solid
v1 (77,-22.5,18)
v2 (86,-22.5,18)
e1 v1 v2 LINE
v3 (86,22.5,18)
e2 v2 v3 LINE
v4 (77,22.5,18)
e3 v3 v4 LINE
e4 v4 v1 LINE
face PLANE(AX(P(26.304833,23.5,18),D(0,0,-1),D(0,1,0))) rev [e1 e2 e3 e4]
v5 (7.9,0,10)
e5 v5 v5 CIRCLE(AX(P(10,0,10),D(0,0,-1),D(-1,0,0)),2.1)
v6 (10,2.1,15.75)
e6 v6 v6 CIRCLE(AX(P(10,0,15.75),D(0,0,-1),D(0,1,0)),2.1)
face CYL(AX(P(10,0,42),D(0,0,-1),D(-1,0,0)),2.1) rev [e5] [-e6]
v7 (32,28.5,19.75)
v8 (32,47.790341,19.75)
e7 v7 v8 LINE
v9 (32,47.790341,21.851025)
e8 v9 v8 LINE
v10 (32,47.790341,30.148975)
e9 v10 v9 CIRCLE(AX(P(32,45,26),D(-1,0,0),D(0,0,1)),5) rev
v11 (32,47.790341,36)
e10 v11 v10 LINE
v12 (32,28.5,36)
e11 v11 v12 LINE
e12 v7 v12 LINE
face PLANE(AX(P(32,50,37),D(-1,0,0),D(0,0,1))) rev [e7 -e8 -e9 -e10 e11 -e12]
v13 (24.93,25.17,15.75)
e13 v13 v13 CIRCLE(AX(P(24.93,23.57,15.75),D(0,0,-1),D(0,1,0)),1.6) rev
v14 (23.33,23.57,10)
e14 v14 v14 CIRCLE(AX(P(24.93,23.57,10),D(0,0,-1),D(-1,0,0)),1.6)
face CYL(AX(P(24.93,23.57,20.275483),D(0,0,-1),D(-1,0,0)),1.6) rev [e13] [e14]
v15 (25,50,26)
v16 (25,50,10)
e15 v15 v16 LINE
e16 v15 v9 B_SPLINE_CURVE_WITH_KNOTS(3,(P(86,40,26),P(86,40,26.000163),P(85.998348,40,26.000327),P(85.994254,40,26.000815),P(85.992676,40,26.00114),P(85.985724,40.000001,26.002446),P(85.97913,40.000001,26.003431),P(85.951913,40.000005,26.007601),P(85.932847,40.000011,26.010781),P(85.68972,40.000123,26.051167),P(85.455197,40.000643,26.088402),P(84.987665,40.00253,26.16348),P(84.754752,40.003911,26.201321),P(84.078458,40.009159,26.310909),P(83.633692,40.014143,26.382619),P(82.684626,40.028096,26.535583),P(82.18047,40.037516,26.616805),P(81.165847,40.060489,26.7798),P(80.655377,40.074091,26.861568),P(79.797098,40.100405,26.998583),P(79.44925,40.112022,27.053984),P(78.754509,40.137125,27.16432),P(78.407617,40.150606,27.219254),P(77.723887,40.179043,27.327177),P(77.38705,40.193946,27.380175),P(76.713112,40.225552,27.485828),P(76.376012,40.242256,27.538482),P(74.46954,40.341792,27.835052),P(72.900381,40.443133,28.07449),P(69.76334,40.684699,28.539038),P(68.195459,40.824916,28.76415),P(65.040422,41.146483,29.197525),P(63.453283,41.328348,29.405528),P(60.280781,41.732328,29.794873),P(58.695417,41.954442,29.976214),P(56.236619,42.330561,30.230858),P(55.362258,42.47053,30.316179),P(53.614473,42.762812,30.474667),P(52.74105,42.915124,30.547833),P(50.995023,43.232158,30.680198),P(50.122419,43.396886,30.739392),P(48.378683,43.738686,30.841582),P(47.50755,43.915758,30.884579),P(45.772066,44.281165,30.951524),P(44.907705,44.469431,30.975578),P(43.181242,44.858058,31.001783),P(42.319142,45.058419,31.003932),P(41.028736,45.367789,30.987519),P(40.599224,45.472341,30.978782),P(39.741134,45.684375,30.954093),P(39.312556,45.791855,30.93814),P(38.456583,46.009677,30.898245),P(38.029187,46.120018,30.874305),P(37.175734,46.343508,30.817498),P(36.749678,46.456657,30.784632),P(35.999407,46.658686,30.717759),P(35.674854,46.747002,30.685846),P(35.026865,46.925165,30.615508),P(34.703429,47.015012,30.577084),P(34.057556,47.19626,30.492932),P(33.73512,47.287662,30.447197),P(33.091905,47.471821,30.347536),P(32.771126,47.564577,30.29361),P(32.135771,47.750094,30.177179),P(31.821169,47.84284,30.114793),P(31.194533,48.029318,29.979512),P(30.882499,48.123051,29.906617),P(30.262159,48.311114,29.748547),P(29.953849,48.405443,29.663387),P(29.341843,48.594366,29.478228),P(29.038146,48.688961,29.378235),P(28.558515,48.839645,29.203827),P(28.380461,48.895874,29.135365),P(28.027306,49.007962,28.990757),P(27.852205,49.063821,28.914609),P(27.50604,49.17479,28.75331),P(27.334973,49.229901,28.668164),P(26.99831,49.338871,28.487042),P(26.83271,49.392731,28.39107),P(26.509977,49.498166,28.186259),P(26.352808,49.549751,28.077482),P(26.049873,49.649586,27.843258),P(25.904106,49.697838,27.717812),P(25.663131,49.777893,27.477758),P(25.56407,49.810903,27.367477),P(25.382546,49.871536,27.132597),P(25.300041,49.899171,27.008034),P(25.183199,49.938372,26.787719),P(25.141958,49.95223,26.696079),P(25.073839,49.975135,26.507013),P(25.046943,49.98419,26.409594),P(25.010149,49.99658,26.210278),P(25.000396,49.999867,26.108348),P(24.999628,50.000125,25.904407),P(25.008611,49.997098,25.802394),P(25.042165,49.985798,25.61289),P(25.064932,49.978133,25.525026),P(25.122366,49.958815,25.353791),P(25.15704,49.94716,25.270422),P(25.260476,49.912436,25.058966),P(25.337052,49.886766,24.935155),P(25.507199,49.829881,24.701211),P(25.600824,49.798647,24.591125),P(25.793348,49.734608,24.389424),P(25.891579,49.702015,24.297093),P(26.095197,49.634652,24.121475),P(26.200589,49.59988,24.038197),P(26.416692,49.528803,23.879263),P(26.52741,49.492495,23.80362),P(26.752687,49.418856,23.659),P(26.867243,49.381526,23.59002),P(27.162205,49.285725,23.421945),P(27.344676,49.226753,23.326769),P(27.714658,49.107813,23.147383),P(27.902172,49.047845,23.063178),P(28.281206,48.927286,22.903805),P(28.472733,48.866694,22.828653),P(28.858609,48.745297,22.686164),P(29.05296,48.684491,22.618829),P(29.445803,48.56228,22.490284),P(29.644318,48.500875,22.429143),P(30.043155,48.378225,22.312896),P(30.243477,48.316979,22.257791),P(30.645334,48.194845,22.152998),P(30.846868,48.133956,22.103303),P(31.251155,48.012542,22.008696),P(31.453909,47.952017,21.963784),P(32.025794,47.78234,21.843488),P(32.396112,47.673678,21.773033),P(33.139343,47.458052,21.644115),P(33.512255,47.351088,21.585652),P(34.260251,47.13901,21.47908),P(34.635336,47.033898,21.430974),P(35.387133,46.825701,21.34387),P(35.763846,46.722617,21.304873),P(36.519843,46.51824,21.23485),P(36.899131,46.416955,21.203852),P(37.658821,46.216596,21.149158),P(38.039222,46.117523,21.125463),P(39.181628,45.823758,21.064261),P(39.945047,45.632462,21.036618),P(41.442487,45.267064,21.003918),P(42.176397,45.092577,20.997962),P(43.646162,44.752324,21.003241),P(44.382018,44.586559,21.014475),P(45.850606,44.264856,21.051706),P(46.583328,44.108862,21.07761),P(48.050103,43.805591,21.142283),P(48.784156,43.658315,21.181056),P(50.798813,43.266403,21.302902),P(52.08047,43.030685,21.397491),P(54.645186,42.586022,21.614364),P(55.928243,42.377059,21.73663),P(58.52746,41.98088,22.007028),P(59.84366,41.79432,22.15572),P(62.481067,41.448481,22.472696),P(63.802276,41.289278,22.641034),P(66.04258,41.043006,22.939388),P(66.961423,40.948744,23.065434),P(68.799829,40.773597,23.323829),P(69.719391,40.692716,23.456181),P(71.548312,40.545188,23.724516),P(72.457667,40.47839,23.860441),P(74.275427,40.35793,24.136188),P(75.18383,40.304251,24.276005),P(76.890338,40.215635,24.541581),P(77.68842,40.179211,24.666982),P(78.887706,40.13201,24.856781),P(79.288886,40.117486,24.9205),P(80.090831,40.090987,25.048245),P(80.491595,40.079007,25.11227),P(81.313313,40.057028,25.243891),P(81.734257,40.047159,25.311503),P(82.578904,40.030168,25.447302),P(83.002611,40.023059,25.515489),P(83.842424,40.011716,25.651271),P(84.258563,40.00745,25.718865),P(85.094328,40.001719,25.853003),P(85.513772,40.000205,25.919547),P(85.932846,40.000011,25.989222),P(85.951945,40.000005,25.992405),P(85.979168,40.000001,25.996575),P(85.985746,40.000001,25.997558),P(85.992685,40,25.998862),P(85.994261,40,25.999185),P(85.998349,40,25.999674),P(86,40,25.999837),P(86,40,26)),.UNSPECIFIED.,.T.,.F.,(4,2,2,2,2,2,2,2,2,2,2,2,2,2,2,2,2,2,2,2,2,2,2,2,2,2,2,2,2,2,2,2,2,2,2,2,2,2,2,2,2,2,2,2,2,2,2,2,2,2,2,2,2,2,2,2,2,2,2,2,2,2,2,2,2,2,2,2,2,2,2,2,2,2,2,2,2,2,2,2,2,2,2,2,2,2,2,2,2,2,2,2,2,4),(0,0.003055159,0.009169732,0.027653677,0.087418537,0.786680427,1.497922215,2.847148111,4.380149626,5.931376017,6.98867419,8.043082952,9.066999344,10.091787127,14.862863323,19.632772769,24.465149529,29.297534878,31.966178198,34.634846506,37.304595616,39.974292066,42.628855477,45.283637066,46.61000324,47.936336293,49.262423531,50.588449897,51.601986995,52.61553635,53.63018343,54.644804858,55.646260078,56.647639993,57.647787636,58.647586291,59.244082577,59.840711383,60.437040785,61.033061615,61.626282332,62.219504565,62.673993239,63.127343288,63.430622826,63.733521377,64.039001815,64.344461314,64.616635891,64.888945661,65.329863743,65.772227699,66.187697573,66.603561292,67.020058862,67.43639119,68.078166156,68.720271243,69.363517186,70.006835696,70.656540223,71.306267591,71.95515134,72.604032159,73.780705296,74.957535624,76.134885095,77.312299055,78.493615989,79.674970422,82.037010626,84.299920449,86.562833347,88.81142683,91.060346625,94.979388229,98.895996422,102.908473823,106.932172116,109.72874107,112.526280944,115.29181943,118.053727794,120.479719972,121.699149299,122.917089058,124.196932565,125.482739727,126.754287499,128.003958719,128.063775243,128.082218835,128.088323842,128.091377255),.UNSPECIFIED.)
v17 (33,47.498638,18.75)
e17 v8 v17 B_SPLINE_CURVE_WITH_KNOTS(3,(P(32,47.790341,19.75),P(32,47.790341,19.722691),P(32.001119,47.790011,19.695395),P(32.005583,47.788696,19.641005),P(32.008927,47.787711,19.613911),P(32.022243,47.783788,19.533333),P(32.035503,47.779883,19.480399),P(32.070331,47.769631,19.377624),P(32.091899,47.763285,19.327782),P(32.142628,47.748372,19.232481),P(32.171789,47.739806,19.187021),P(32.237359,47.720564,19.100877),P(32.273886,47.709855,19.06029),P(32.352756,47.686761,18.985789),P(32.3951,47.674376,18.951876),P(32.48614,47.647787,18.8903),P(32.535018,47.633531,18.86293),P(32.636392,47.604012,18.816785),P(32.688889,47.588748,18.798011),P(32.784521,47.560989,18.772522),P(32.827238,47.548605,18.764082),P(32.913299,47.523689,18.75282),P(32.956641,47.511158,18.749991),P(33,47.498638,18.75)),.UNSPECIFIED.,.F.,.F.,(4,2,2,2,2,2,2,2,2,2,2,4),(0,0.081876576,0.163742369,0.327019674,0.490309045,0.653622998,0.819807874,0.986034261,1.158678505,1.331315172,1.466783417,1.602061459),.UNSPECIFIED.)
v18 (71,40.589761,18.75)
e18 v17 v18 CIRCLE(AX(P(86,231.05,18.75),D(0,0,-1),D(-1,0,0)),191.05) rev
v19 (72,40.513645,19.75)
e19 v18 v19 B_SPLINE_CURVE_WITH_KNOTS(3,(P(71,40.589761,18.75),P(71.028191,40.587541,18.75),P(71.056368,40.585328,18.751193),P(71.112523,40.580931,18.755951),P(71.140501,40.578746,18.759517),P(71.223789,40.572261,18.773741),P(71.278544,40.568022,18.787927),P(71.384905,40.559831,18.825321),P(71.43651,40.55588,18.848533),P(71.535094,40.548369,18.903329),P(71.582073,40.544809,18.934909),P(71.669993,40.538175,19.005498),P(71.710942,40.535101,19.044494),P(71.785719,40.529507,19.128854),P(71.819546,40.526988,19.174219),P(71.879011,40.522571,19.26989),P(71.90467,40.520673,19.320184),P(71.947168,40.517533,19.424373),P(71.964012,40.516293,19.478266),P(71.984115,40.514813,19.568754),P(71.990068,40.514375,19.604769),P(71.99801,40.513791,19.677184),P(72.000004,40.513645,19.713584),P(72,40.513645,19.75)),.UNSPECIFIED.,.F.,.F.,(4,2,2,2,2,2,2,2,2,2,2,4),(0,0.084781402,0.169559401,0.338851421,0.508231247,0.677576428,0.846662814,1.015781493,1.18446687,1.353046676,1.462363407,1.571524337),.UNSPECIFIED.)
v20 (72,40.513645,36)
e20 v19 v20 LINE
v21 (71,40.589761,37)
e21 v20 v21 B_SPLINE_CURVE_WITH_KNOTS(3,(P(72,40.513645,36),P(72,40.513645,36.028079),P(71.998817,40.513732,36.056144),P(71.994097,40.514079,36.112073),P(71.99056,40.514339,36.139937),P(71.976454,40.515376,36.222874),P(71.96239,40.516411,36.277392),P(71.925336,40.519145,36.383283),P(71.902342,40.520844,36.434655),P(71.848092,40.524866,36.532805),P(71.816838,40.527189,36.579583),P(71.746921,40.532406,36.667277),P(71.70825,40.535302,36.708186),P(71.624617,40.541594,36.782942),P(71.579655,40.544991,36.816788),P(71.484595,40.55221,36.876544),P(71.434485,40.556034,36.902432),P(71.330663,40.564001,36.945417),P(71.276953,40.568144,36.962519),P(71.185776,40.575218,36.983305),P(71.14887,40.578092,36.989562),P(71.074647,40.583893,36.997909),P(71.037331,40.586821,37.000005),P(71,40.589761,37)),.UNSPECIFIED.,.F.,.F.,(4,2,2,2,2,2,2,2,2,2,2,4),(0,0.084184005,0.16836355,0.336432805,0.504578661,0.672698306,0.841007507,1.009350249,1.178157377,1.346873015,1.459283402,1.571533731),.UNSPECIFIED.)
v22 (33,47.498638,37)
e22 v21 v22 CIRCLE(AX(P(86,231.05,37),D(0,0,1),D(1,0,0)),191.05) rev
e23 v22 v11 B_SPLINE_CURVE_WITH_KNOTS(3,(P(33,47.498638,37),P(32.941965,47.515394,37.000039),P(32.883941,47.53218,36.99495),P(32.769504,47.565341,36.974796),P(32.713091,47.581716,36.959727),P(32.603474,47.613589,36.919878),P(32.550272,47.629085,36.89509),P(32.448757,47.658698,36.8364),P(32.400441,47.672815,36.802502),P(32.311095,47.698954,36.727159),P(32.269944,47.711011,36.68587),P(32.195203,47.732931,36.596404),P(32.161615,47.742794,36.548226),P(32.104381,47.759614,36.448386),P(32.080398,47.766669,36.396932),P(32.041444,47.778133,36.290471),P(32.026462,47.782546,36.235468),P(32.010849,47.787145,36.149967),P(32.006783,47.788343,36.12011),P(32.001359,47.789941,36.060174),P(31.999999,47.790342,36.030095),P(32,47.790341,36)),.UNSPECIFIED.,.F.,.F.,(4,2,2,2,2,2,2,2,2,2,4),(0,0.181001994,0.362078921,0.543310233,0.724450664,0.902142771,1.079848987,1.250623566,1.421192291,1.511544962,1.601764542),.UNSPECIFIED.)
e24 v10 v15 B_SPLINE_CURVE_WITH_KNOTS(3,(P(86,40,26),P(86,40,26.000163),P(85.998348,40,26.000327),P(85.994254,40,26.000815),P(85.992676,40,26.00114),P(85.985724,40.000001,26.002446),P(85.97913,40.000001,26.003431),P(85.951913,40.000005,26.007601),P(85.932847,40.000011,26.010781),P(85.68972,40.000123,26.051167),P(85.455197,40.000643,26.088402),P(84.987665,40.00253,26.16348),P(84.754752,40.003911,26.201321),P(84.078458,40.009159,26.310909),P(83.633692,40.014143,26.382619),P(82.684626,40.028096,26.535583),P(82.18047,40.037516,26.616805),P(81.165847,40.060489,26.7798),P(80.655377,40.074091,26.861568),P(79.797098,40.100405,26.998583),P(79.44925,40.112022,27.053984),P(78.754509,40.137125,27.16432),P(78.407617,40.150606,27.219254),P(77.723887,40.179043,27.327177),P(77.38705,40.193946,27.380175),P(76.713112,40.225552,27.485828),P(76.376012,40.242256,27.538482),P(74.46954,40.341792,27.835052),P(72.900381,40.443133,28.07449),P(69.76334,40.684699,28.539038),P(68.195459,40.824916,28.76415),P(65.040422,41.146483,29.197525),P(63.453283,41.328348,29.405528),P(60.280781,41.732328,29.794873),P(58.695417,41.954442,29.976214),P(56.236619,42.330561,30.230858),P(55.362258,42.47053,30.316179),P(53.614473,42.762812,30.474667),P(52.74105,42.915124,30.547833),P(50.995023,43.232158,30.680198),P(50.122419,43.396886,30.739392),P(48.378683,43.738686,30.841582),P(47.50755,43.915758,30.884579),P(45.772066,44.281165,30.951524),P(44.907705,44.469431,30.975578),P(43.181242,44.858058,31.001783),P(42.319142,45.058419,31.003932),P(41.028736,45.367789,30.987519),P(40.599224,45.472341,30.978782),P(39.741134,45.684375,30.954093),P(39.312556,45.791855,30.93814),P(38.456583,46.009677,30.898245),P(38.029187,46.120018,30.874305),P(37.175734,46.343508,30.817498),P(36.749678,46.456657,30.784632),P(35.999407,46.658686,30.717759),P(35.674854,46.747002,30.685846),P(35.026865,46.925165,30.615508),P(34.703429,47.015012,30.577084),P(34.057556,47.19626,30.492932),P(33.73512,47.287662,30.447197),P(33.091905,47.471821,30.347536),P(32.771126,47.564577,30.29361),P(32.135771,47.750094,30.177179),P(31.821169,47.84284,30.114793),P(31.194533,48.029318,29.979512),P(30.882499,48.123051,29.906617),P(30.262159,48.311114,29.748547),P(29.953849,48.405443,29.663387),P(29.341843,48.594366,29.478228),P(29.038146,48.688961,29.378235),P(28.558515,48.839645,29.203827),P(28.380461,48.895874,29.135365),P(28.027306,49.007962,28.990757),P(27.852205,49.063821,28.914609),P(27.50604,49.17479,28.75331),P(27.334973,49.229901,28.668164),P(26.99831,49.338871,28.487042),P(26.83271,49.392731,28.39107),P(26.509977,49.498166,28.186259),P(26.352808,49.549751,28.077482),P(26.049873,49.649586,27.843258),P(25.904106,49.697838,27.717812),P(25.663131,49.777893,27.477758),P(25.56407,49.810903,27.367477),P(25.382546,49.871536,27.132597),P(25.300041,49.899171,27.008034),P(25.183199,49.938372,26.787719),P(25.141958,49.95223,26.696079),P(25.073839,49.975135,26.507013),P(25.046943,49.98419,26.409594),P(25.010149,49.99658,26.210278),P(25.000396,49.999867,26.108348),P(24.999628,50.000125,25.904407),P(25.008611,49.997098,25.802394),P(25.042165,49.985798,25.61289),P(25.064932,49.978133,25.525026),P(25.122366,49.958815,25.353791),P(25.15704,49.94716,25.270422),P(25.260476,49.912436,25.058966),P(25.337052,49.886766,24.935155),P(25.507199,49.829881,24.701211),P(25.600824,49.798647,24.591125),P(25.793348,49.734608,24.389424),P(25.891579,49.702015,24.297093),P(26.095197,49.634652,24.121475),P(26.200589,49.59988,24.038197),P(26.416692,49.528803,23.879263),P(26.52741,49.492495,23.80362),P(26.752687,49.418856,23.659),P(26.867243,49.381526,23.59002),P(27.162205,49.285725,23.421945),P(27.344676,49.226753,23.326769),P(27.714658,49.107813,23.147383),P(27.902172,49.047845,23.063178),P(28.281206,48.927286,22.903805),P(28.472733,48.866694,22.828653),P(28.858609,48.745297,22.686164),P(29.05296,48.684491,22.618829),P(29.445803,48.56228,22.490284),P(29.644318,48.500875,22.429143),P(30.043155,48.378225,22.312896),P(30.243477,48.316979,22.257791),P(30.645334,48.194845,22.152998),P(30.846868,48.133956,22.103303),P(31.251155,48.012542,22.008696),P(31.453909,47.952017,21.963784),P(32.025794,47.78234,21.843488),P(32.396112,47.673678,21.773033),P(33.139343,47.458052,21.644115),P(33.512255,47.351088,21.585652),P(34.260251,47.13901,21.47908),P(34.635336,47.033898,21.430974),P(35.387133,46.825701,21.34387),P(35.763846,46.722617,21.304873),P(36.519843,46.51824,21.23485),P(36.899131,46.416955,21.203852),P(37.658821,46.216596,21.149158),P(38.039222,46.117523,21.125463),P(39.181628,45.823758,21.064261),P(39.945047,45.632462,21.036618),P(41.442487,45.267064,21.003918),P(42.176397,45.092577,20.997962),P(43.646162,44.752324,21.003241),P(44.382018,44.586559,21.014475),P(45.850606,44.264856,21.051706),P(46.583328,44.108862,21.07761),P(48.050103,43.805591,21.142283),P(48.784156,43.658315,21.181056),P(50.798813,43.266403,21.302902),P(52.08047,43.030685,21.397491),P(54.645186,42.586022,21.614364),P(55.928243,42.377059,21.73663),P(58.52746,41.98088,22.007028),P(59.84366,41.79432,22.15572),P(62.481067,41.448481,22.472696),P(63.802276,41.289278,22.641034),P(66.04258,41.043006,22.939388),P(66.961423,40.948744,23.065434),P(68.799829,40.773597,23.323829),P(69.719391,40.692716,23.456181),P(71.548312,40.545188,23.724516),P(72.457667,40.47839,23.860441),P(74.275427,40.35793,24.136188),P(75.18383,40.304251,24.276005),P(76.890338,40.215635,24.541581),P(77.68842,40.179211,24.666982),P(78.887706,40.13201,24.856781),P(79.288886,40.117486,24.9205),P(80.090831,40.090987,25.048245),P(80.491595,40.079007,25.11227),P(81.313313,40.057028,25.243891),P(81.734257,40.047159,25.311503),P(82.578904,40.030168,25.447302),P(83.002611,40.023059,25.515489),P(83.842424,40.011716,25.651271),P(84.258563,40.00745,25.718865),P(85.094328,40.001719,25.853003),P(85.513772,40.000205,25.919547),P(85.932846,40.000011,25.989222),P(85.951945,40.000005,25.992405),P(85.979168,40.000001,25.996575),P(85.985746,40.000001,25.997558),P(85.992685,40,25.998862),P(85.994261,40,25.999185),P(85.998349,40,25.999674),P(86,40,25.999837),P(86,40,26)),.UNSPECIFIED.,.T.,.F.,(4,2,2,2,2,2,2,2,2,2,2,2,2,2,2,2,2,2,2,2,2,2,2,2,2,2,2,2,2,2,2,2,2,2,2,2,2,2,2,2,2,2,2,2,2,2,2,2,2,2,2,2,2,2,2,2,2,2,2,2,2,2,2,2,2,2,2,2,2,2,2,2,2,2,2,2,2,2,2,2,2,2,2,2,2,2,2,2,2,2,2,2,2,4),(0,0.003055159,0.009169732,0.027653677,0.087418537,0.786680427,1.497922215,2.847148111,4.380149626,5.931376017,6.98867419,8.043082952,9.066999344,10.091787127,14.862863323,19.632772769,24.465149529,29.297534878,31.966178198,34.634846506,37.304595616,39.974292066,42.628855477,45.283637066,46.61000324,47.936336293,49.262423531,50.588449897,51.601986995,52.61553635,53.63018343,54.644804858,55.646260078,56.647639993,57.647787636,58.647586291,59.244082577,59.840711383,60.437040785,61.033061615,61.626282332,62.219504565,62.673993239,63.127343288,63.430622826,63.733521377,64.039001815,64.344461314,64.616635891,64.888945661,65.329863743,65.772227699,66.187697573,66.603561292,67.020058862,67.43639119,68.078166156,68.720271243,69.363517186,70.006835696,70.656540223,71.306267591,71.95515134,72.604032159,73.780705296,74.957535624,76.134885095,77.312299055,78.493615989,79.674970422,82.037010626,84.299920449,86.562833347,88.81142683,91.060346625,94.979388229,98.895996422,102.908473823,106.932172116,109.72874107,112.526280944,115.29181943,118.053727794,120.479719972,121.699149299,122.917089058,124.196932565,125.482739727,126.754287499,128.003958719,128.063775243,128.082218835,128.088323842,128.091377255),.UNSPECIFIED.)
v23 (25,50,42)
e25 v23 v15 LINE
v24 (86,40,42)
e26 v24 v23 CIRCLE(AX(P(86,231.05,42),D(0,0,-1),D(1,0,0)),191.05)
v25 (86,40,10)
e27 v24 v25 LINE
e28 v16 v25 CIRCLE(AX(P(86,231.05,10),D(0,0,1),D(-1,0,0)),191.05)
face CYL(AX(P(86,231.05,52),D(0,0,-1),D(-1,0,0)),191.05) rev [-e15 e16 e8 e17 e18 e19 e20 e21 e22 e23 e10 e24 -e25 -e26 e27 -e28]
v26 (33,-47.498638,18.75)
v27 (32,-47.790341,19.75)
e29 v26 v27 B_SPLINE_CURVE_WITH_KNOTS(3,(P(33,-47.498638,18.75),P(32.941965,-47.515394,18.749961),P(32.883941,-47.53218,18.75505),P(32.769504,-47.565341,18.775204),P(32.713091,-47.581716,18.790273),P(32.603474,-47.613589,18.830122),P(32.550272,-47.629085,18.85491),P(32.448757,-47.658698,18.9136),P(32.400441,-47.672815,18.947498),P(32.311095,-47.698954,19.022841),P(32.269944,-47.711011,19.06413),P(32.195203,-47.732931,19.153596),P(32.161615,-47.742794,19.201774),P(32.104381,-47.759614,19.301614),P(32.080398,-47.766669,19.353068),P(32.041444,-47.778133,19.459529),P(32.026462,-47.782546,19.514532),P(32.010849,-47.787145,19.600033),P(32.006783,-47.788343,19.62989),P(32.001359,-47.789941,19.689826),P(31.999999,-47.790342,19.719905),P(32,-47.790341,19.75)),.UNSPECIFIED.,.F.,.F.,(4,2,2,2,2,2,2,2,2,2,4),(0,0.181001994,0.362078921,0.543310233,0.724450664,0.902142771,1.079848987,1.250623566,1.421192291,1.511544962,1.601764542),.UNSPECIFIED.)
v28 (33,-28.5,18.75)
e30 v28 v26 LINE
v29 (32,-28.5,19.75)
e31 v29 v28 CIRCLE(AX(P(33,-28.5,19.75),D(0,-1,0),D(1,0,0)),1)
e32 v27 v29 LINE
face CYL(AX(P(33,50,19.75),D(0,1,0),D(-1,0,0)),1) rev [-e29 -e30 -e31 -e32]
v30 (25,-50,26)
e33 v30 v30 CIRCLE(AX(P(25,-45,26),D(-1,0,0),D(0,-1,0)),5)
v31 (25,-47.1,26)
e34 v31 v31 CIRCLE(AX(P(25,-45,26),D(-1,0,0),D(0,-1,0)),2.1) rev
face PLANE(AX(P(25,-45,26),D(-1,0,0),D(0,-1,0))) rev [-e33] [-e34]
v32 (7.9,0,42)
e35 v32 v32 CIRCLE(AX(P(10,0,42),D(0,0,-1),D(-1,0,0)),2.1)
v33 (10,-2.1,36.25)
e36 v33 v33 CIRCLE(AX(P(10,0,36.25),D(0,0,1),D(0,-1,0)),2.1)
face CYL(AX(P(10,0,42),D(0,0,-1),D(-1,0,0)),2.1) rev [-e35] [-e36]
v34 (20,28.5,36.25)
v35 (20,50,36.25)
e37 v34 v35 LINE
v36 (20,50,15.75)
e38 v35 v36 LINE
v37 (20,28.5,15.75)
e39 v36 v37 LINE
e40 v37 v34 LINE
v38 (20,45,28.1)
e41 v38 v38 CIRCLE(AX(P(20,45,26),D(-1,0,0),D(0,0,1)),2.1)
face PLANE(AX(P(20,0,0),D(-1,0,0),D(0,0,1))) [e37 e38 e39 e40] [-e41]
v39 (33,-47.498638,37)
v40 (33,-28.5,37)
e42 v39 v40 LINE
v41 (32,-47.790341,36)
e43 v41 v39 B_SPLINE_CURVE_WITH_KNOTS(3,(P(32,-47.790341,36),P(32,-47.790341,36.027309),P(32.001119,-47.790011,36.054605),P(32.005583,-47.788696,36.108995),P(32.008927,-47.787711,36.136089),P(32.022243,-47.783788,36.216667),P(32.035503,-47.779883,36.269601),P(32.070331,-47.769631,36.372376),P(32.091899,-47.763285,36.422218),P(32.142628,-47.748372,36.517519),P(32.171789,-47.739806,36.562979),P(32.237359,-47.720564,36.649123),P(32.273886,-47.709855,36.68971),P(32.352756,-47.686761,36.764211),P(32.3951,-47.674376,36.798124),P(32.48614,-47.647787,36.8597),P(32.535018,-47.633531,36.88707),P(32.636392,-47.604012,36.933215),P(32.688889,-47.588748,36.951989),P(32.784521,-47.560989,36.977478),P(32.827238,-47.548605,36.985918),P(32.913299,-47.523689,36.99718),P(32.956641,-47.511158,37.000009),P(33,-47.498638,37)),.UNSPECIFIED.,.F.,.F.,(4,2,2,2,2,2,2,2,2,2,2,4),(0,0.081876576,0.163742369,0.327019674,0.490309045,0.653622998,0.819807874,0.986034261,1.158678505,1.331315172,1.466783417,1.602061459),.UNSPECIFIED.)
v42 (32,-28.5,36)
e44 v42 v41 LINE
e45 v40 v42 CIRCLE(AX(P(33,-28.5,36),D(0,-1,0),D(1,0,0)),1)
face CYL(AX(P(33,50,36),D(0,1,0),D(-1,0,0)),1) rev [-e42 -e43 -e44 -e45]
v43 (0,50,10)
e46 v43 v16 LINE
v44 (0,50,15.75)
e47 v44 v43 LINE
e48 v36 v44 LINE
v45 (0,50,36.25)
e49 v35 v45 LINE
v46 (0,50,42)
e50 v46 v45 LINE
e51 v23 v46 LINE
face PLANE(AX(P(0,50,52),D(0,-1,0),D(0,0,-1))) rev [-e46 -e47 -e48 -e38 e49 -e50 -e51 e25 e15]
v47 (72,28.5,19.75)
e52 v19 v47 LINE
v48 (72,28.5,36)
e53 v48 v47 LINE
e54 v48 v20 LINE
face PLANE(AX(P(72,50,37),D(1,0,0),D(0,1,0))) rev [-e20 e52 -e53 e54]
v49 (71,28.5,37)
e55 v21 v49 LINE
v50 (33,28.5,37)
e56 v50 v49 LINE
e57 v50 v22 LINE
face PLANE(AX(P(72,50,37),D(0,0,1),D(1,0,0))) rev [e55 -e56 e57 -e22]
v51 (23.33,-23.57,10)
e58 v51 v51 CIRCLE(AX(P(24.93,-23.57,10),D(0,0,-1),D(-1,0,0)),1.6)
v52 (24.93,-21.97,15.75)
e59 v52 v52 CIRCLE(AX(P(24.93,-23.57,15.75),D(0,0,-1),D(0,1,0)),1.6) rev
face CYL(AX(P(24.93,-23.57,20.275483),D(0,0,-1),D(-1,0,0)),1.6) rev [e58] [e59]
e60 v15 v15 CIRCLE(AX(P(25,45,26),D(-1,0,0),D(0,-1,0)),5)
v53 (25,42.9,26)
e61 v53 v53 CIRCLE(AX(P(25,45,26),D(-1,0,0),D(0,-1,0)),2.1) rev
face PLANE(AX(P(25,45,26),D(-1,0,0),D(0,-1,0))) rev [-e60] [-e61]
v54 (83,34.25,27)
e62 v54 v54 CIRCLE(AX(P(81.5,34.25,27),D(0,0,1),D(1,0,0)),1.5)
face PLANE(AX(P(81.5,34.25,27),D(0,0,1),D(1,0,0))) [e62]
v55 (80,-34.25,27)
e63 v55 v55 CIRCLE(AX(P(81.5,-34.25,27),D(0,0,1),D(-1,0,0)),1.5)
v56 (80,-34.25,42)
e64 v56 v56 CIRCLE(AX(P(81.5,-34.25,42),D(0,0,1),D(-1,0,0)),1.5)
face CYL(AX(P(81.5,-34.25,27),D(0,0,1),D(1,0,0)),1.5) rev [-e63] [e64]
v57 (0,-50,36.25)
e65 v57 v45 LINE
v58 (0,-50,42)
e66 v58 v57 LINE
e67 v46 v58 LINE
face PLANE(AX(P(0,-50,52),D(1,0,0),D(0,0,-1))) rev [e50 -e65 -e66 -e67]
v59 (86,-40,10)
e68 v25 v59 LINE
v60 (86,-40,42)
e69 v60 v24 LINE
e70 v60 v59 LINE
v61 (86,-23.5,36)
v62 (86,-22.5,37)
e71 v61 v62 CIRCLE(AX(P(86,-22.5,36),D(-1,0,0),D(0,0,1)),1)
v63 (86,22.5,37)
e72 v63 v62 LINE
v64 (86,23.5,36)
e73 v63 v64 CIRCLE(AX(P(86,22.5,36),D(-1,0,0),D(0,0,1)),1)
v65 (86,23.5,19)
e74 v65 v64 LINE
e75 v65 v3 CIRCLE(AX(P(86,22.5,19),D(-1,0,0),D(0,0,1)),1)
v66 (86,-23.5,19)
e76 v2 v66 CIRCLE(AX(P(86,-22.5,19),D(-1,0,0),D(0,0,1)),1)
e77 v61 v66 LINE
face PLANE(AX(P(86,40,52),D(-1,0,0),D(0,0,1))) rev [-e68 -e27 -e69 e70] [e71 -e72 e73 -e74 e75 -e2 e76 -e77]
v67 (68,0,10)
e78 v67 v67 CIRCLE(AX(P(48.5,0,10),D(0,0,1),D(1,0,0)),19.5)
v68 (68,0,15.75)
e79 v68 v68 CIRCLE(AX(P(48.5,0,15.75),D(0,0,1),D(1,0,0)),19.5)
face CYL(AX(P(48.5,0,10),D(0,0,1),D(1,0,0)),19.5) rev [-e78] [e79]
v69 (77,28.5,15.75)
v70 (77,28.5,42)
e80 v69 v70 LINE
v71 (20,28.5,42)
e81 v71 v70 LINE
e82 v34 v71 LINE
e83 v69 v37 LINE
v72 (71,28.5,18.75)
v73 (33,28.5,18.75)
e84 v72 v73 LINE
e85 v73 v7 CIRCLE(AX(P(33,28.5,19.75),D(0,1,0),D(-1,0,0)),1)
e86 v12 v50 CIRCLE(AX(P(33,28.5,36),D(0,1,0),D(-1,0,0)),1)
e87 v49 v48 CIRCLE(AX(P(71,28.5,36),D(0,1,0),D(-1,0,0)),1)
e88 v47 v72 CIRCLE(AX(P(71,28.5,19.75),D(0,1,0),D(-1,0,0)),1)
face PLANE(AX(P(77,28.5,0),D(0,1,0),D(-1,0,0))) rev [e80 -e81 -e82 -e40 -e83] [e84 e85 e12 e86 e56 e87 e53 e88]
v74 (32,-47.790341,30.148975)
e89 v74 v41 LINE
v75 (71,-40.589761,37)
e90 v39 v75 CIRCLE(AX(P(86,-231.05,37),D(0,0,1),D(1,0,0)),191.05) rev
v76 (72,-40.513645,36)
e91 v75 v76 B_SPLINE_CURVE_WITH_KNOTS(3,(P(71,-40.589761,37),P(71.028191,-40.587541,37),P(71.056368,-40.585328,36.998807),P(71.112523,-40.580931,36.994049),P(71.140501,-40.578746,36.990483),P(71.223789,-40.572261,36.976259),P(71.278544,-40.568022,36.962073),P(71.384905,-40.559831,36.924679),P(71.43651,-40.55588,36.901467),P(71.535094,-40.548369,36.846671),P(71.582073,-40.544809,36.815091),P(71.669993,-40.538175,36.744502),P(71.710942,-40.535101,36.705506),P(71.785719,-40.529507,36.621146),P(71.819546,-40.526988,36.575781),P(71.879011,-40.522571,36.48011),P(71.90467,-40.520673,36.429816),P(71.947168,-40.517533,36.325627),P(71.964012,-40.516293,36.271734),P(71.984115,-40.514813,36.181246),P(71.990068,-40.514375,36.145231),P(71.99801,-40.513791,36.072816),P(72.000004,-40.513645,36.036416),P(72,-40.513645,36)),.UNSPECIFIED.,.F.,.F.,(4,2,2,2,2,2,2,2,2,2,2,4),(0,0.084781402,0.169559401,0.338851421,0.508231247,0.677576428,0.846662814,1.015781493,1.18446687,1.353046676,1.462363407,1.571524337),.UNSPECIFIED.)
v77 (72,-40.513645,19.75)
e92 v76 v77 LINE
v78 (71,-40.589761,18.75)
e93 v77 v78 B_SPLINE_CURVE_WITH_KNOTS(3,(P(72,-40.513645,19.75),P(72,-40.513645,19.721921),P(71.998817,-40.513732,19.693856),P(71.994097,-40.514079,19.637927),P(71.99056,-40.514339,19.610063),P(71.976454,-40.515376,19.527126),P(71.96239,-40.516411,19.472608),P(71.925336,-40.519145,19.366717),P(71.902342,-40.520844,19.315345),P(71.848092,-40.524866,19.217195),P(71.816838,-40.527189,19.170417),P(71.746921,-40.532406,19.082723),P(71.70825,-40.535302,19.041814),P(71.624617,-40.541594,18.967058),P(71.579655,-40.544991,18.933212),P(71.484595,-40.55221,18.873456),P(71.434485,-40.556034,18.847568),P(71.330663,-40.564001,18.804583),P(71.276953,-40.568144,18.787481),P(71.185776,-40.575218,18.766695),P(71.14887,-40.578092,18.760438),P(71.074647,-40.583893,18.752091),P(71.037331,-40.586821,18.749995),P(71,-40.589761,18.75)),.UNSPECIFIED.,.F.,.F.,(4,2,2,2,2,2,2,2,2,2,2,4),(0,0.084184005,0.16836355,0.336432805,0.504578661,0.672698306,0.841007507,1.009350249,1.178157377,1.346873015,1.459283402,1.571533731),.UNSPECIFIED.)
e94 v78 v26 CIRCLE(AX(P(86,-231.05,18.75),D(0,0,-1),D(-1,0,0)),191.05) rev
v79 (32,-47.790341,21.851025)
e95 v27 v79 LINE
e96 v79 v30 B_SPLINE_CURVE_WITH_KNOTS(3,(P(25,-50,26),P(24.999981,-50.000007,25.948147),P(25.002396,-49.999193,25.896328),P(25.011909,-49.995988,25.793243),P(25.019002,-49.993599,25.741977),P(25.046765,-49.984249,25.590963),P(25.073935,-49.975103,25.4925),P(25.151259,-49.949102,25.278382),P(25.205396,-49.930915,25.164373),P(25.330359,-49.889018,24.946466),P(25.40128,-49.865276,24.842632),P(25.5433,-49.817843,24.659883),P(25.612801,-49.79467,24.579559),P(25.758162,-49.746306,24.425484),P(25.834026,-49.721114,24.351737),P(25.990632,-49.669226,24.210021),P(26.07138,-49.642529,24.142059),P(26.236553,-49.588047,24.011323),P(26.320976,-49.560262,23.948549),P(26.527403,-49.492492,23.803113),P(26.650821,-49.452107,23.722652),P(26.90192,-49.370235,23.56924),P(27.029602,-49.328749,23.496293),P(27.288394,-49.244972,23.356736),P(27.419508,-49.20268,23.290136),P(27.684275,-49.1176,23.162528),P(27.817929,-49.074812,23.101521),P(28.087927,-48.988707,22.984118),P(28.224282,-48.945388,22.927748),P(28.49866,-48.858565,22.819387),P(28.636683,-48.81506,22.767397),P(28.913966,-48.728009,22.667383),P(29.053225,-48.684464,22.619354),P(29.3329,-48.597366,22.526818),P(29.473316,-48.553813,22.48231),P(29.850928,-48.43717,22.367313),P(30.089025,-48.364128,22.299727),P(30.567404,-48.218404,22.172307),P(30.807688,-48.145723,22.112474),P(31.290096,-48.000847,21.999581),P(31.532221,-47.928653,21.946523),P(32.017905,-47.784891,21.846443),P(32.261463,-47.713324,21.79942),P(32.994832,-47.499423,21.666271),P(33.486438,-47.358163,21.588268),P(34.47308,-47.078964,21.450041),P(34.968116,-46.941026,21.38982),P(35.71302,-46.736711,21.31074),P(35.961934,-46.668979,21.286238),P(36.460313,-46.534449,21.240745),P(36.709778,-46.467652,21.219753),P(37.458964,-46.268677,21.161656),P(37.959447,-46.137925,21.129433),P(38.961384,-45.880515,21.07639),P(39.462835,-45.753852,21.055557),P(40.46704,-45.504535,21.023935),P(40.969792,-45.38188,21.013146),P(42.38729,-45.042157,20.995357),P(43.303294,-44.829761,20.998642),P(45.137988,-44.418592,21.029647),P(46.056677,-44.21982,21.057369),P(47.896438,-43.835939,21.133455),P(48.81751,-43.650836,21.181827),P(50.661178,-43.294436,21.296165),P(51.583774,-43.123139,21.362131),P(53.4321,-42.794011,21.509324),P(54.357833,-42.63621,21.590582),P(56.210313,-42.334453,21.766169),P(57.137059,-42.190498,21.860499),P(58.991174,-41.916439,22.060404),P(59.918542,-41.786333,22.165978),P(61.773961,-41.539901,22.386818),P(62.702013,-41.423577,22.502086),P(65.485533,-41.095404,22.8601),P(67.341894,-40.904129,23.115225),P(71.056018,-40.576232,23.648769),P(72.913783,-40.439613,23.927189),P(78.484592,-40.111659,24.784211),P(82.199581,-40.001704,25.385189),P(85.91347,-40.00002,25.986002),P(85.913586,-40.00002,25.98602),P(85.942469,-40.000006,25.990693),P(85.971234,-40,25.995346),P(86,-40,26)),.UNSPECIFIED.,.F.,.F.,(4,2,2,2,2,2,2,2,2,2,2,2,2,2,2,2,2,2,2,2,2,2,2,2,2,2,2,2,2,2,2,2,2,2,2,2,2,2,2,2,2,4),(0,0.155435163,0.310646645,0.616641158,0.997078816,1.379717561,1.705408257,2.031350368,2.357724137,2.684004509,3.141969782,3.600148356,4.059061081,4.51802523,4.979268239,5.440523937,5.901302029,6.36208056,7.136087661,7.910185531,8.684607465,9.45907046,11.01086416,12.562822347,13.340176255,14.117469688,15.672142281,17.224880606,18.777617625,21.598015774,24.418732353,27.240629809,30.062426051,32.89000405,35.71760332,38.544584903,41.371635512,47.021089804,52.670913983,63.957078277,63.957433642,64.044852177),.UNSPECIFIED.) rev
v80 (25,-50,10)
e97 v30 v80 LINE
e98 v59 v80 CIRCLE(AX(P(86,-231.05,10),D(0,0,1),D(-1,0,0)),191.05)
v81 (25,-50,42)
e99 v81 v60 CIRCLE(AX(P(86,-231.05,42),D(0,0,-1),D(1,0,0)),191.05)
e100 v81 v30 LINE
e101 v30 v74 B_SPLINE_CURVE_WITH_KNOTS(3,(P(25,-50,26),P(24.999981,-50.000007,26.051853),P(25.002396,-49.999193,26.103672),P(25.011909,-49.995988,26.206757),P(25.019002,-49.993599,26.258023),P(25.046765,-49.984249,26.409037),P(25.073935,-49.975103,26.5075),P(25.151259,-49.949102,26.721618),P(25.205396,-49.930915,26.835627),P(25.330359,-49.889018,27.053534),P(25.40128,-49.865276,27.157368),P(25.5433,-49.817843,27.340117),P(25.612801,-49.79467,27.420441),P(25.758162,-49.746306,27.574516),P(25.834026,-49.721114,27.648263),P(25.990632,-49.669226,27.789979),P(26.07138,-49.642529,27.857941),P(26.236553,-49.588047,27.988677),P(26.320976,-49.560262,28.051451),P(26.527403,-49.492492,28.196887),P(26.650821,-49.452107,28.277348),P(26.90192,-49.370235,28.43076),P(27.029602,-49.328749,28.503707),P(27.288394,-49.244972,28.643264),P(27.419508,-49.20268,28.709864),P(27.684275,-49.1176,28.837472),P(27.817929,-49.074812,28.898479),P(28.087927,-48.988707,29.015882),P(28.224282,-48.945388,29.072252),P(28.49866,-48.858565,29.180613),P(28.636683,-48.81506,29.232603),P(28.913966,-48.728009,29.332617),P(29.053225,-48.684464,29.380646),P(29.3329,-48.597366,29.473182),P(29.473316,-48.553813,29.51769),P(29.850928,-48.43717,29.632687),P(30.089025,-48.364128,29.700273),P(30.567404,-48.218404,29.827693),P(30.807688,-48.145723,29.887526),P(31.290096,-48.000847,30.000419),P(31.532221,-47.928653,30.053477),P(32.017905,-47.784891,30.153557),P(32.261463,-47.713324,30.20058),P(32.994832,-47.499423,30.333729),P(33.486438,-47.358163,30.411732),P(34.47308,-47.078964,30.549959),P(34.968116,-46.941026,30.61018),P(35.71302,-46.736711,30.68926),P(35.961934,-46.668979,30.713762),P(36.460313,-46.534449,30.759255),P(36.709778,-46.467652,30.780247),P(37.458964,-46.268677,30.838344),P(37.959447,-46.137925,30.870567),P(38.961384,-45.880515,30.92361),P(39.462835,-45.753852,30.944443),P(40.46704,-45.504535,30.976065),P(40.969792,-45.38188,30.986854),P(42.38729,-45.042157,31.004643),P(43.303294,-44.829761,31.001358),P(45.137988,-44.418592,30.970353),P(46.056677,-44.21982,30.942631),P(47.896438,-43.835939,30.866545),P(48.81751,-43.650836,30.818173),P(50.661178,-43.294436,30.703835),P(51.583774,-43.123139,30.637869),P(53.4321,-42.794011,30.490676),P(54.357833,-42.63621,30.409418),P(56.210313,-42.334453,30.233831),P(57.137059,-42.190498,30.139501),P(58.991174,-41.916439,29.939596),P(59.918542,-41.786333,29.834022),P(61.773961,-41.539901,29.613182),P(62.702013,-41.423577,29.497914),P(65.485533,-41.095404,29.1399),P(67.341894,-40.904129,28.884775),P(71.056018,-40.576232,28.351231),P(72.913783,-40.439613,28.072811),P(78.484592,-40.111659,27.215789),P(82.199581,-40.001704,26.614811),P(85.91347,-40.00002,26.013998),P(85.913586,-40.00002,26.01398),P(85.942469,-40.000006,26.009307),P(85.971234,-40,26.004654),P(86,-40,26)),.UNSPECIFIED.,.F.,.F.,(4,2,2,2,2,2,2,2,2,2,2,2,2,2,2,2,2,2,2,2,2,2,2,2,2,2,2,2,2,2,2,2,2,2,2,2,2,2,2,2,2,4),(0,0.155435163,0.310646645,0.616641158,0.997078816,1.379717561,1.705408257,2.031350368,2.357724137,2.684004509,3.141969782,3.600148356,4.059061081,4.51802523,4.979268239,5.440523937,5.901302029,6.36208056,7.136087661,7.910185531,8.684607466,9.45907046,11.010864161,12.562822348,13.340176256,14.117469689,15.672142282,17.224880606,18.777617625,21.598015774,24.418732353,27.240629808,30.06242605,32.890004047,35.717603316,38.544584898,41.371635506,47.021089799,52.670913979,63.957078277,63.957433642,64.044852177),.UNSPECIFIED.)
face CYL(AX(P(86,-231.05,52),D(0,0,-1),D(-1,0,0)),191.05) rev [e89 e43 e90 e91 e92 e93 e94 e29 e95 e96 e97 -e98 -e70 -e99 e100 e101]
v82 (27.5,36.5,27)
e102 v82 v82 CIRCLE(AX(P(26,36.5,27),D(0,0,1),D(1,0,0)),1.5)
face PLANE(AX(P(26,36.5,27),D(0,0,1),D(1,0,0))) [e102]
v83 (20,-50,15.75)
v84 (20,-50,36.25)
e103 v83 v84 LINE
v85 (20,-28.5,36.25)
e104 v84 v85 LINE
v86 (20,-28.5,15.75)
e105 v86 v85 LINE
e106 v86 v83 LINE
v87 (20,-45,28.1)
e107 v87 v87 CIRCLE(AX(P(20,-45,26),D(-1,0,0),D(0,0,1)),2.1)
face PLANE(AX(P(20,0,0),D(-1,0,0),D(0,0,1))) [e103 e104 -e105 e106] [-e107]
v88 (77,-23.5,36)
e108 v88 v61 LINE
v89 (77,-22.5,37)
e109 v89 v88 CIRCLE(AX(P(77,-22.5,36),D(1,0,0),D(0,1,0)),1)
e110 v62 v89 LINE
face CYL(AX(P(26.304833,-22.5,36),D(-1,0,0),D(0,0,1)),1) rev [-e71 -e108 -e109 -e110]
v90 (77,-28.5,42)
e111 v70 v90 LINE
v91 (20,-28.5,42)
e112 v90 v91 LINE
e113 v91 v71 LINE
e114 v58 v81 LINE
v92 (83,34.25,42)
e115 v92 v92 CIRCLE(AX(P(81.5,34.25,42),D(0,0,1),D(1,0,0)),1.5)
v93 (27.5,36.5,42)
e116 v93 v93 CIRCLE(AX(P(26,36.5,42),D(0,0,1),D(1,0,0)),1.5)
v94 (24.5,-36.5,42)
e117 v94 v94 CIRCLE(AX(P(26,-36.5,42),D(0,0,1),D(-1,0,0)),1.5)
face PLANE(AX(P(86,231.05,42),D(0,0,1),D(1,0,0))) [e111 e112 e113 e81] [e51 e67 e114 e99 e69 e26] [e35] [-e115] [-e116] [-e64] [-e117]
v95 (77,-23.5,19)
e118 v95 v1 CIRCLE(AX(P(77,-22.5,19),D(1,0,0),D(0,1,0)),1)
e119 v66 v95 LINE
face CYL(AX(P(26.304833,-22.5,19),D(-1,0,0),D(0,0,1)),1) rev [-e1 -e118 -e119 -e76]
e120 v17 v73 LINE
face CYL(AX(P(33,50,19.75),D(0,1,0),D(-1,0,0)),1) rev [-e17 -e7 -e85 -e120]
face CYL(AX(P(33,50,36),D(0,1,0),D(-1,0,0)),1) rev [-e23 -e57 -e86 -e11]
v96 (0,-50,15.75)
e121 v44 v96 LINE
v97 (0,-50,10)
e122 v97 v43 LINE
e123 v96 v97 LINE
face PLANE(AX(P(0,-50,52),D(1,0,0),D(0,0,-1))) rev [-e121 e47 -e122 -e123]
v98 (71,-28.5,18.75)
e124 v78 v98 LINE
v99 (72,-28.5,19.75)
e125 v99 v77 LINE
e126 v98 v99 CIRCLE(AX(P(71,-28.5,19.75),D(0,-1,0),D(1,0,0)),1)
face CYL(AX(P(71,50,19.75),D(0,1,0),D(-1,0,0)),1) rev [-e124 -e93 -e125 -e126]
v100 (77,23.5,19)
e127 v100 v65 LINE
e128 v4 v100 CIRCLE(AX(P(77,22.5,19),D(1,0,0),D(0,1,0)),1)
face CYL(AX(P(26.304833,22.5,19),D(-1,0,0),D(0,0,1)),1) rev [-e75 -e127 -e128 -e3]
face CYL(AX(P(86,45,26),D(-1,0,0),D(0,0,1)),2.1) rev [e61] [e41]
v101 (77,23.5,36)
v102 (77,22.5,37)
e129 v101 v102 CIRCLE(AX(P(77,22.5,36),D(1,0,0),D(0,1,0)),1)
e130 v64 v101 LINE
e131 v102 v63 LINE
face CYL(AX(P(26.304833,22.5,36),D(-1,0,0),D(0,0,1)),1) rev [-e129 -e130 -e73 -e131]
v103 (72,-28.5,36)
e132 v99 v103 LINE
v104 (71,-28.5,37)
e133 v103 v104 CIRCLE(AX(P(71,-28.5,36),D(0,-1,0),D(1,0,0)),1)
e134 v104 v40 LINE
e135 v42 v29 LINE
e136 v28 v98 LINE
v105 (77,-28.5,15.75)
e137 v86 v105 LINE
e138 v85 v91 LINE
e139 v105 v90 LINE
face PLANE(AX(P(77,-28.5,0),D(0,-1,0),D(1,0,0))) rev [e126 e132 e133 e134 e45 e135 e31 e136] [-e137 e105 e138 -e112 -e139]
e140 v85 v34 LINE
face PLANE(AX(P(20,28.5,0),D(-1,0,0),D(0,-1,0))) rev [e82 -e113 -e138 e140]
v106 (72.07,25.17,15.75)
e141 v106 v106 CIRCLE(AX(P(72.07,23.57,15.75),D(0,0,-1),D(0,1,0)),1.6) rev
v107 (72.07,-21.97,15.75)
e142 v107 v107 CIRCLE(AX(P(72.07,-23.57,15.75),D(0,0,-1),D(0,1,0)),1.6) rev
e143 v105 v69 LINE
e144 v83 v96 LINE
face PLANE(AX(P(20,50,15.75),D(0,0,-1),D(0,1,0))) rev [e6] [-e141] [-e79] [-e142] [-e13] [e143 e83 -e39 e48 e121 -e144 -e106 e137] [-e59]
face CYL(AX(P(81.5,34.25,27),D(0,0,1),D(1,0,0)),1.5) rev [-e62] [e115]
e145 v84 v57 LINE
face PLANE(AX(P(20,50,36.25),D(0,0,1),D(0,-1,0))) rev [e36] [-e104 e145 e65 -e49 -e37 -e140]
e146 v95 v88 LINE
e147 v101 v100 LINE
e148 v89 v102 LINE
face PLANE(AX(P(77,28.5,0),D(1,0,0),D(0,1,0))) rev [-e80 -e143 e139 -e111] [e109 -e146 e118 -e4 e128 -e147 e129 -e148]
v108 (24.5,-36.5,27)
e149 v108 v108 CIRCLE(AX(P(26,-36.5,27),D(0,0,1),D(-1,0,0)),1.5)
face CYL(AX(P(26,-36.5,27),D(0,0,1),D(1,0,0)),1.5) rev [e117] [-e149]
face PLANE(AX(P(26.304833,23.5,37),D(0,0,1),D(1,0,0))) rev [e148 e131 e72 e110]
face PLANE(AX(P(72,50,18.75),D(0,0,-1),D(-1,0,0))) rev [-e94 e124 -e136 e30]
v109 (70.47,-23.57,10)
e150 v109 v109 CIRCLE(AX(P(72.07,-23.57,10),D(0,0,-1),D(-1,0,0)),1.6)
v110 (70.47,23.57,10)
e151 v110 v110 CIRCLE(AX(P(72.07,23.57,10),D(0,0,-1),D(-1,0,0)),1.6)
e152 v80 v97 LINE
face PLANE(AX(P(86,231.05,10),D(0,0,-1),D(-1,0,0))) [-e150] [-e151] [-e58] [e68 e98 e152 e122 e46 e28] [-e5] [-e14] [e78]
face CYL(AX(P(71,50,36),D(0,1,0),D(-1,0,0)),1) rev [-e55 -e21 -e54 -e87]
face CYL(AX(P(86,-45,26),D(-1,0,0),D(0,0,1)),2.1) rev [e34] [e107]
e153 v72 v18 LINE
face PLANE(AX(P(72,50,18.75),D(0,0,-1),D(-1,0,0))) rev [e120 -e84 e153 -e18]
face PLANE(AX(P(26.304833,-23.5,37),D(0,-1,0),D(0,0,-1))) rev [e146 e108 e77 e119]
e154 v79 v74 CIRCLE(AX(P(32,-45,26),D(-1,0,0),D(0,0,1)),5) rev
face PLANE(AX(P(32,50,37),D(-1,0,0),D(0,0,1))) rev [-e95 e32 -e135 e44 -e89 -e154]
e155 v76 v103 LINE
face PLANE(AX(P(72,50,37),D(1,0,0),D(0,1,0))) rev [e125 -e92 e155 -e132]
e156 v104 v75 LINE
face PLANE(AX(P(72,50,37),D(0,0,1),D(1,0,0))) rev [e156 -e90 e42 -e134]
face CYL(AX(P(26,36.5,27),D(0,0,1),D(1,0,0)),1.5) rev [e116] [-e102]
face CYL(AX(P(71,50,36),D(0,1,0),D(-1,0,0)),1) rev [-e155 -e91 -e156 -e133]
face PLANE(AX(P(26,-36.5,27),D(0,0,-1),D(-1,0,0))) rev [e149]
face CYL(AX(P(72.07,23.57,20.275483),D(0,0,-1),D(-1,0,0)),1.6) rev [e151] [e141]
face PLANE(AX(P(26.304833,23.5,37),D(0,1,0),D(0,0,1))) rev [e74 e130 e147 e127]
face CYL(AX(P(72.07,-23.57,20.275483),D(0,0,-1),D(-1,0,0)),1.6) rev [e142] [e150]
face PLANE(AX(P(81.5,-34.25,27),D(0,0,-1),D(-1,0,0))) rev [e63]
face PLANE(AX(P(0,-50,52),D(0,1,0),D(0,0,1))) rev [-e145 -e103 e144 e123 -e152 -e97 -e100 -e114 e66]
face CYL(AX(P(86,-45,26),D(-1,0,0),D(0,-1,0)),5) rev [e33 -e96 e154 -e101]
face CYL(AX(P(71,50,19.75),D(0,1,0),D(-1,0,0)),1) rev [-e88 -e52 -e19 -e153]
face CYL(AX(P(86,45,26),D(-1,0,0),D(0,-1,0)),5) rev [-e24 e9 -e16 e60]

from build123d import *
from build123d.topology import SkipClean

# Parameters (mm, degrees)
EXTRUDE_1_DEPTH           = 52
CUT_EXTRUDE_1_DEPTH       = 113.24972160321826
CUT_EXTRUDE_2_DEPTH       = 20
CUT_EXTRUDE_3_DEPTH       = 10
CUT_EXTRUDE_START         = -10
CUT_EXTRUDE_4_DEPTH       = 10
EXTRUDE_2_DEPTH           = 5.75
SKETCH_7_R                = 19.499999999999996
CUT_EXTRUDE_5_DEPTH       = 103.88373292216811
SKETCH_8_R                = 2.1
CUT_EXTRUDE_6_DEPTH       = 93.84395510748136
CUT_EXTRUDE_START_2       = -61.0000001
CUT_EXTRUDE_7_OUTLINE_R   = 5
CUT_EXTRUDE_7_OUTLINE_R_2 = 2.1
CUT_EXTRUDE_7_DEPTH       = 61.0000001
SKETCH_12_R               = 2.099999999999999
CUT_EXTRUDE_8_DEPTH       = 105.49880398167254
SKETCH_14_R               = 1.600000000000005
CUT_EXTRUDE_9_DEPTH       = 5.75
CUT_EXTRUDE_10_DEPTH      = 9
CUT_EXTRUDE1_DEPTH        = 124.78307655451134
CUT_EXTRUDE1_DEPTH_BACK   = 124.78307655451134
FILLET_1_R                = 1
FILLET_2_R                = 1
FILLET_3_R                = 1
EXTRUDE_START             = -32
EXTRUDE_3_DEPTH           = 32
EXTRUDE_4_DEPTH           = 32
SKETCH_18_R               = 1.4999999999999973
SKETCH_18_R_2             = 1.5000000000000009
CUT_EXTRUDE_11_DEPTH      = 15


# Read off the part's stored shape, not the designer's step: Вырез-Вытянуть7
with BuildPart() as part:
    # Эскиз1 → Бобышка-Вытянуть1 (new body)
    with BuildSketch(Plane.XY):
        with BuildLine():
            Line((0, -50), (0, 50))
            Line((0, 50), (25, 50))
            ThreePointArc((25, 50), (55.092881078948835, 42.516574581587776), (86, 40))
            Line((86, 40), (86, -40))
            ThreePointArc((86, -40), (55.09288107894883, -42.516574581587776), (25, -50))
            Line((25, -50), (0, -50))
        make_face()
    extrude(amount=EXTRUDE_1_DEPTH)

    # Эскиз2 → Вырез-Вытянуть1 (cut, through all)
    with BuildSketch(Plane.XY.offset(52)):
        Polygon((77, 28.5), (77.00000000000001, -28.5), (20.000000000000004, -28.50000000000001), (19.999999999999996, 28.499999999999996), align=None)
    extrude(amount=-CUT_EXTRUDE_1_DEPTH, mode=Mode.SUBTRACT)

    # Эскиз3 → Вырез-Вытянуть2 (cut)
    with BuildSketch(Plane.ZY):
        Polygon((15.75, 50), (36.25, 50), (36.25000000000001, -50), (15.74999999999999, -50), align=None)
    extrude(amount=-CUT_EXTRUDE_2_DEPTH, mode=Mode.SUBTRACT)

    # Эскиз4 → Вырез-Вытянуть3 (cut)
    with BuildSketch(Plane(origin=(0, 0, 0), x_dir=(-1, 0, 0), z_dir=(0, 0, -1))):
        with BuildLine():
            Line((0, 50), (-24.999999999999968, 50.00000000000003))
            ThreePointArc((-24.999999999999968, 50.00000000000003), (-55.092881078948814, 42.516574581587804), (-86.00000000000003, 40.00000000000001))
            Line((-86.00000000000003, 40.00000000000001), (-85.99999999999999, -39.99999999999998))
            ThreePointArc((-85.99999999999999, -39.99999999999998), (-55.09288107894881, -42.516574581587776), (-24.999999999999993, -50))
            Line((-24.999999999999993, -50), (0, -50))
            Line((0, -50), (0, 50))
        make_face()
    extrude(amount=-CUT_EXTRUDE_3_DEPTH, mode=Mode.SUBTRACT)

    # Эскиз5 → Вырез-Вытянуть4 (cut)
    with BuildSketch(Plane.XY.offset(52).offset(CUT_EXTRUDE_START)):
        with BuildLine():
            Line((24.999999999999968, 50.00000000000003), (0, 50))
            Line((0, 50), (0, -50))
            Line((0, -50), (25, -50))
            ThreePointArc((25, -50), (55.09288107894883, -42.516574581587776), (85.99999999999997, -39.99999999999998))
            Line((85.99999999999997, -39.99999999999998), (86, 40))
            ThreePointArc((86, 40), (55.092881078948835, 42.516574581587804), (24.999999999999968, 50.00000000000003))
        make_face()
    extrude(amount=CUT_EXTRUDE_4_DEPTH, mode=Mode.SUBTRACT)

    # Эскиз6 → Бобышка-Вытянуть2 (add)
    with BuildSketch(Plane(origin=(0, 0, 10), x_dir=(-1, 0, 0), z_dir=(0, 0, -1))):
        Polygon((-20.000000000000004, -28.50000000000001), (-77.00000000000001, -28.5), (-77, 28.5), (-19.999999999999996, 28.499999999999996), align=None)
    extrude(amount=-EXTRUDE_2_DEPTH)

    # Эскиз7 → Вырез-Вытянуть5 (cut, through all)
    with BuildSketch(Plane.XY.offset(15.749999999999993)):
        with Locations((48.50000000000001, 0)):
            Circle(SKETCH_7_R)
    extrude(amount=-CUT_EXTRUDE_5_DEPTH, mode=Mode.SUBTRACT)

    # Эскиз8 → Вырез-Вытянуть6 (cut, through all)
    with BuildSketch(Plane.ZY.offset(-20)):
        with Locations((26, -45.00000000000001)):
            Circle(SKETCH_8_R)
        with Locations((26, 45)):
            Circle(SKETCH_8_R)
    extrude(amount=-CUT_EXTRUDE_6_DEPTH, mode=Mode.SUBTRACT)

    # Вырез-Вытянуть7 outline → Вырез-Вытянуть7 (cut)
    # profile 1 of 2: a face of its own
    with BuildSketch(Plane.ZY.offset(-25).offset(CUT_EXTRUDE_START_2)):
        with Locations((26, 45)):
            Circle(CUT_EXTRUDE_7_OUTLINE_R)
        with Locations((26, 45)):
            Circle(CUT_EXTRUDE_7_OUTLINE_R_2, mode=Mode.SUBTRACT)
    # profile 2 of 2: a face of its own
    with BuildSketch(Plane.ZY.offset(-25).offset(CUT_EXTRUDE_START_2)):
        with Locations((26, -45)):
            Circle(CUT_EXTRUDE_7_OUTLINE_R)
        with Locations((26, -45)):
            Circle(CUT_EXTRUDE_7_OUTLINE_R_2, mode=Mode.SUBTRACT)
    extrude(amount=CUT_EXTRUDE_7_DEPTH, mode=Mode.SUBTRACT)

    # Эскиз12 → Вырез-Вытянуть8 (cut, through all)
    with BuildSketch(Plane(origin=(0, 0, 10), x_dir=(-1, 0, 0), z_dir=(0, 0, -1))):
        with Locations((-10, 0)):
            Circle(SKETCH_12_R)
    extrude(amount=-CUT_EXTRUDE_8_DEPTH, mode=Mode.SUBTRACT)

    # Эскиз14 → Вырез-Вытянуть9 (cut)
    with BuildSketch(Plane(origin=(0, 0, 10), x_dir=(-1, 0, 0), z_dir=(0, 0, -1))):
        with Locations((-72.07000000000002, 23.569999999999993)):
            Circle(SKETCH_14_R)
        with Locations((-24.930000000000014, 23.57)):
            Circle(SKETCH_14_R)
        with Locations((-24.930000000000007, -23.57)):
            Circle(SKETCH_14_R)
        with Locations((-72.07000000000001, -23.570000000000007)):
            Circle(SKETCH_14_R)
    extrude(amount=-CUT_EXTRUDE_9_DEPTH, mode=Mode.SUBTRACT)

    # Эскиз15 → Вырез-Вытянуть10 (cut)
    with BuildSketch(Plane(origin=(86, 0, 0), x_dir=(0, 0, -1), z_dir=(1, 0, 0))):
        Polygon((-37, 23.499999999999996), (-18.000000000000004, 23.499999999999996), (-18, -23.500000000000004), (-37, -23.500000000000004), align=None)
    extrude(amount=-CUT_EXTRUDE_10_DEPTH, mode=Mode.SUBTRACT)

    # Sketch1 → Cut-Extrude1 (cut, two sides: drawn at the far end of the back side and taken through both)
    with BuildSketch(Plane.XZ.offset(-28.499999999999996).offset(-CUT_EXTRUDE1_DEPTH_BACK)):
        Polygon((72, 37), (72, 18.749999999999986), (31.999999999999993, 18.74999999999998), (31.999999999999986, 36.99999999999999), align=None)
    extrude(amount=CUT_EXTRUDE1_DEPTH + CUT_EXTRUDE1_DEPTH_BACK, mode=Mode.SUBTRACT)

    # Скругление1
    fillet_1_edges = [part.edges().sort_by_distance(p)[0] for p in [
        (81.5, -23.500000000000004, 37),
        (81.5, 23.499999999999996, 37),
        (81.5, 23.499999999999996, 18.000000000000004),
        (81.5, -23.500000000000004, 18),
    ]]
    fillet(fillet_1_edges, radius=FILLET_1_R)

    # Скругление2
    fillet_2_edges = [part.edges().sort_by_distance(p)[0] for p in [
        (31.999999999999986, 38.145170659331654, 36.99999999999999),
        (71.99999999999999, 34.50682260061859, 18.749999999999986),
        (71.99999999999999, 34.506822600618605, 37),
        (31.999999999999993, 38.14517065933167, 18.74999999999998),
    ]]
    fillet(fillet_2_edges, radius=FILLET_2_R)

    # Скругление3
    fillet_3_edges = [part.edges().sort_by_distance(p)[0] for p in [
        (31.999999999999996, -38.14517065933168, 36.99999999999999),
        (72, -34.50682260061862, 18.749999999999986),
        (72, -34.50682260061859, 37),
        (32.00000000000001, -38.14517065933168, 18.74999999999998),
    ]]
    fillet(fillet_3_edges, radius=FILLET_3_R)

    # Эскиз16 → Бобышка-Вытянуть3 (add)
    with BuildSketch(Plane.XY.offset(41.99999999999999).offset(EXTRUDE_START)):
        with BuildLine():
            Line((72, 40.51364520123729), (72, 28.5))
            Line((72, 28.5), (86, 28.499999999999996))
            Line((86, 28.499999999999996), (86, 40))
            ThreePointArc((86, 40), (78.99529030949971, 40.12845448417352), (72, 40.51364520123729))
        make_face()
    extrude(amount=EXTRUDE_3_DEPTH)

    # Эскиз17 → Бобышка-Вытянуть4 (add)
    with SkipClean():  # the faces are left unmerged after this step: merging them gives an invalid solid
        with BuildSketch(Plane.XY.offset(41.99999999999999).offset(EXTRUDE_START)):
            with BuildLine():
                Line((85.99999999999997, -39.99999999999998), (85.99999999999997, -28.5))
                Line((85.99999999999997, -28.5), (72.00000000000001, -28.5))
                Line((72.00000000000001, -28.5), (72.00000000000001, -40.51364520123727))
                ThreePointArc((72.00000000000001, -40.51364520123727), (78.99529030949971, -40.12845448417346), (85.99999999999997, -39.99999999999998))
            make_face()
        extrude(amount=EXTRUDE_4_DEPTH)

    # Эскиз18 → Вырез-Вытянуть11 (cut)
    with SkipClean():  # the faces are left unmerged after this step: merging them gives an invalid solid
        with BuildSketch(Plane.XY.offset(41.99999999999999)):
            with Locations((81.49999999999999, 34.25)):
                Circle(SKETCH_18_R)
            with Locations((25.999999999999996, 36.5)):
                Circle(SKETCH_18_R_2)
            with Locations(Location((81.49999999999999, -34.25, 0), (0, 0, 180))):
                Circle(SKETCH_18_R)
            with Locations(Location((25.999999999999996, -36.5, 0), (0, 0, 180))):
                Circle(SKETCH_18_R_2)
        extrude(amount=-CUT_EXTRUDE_11_DEPTH, mode=Mode.SUBTRACT)


solid = part.part
